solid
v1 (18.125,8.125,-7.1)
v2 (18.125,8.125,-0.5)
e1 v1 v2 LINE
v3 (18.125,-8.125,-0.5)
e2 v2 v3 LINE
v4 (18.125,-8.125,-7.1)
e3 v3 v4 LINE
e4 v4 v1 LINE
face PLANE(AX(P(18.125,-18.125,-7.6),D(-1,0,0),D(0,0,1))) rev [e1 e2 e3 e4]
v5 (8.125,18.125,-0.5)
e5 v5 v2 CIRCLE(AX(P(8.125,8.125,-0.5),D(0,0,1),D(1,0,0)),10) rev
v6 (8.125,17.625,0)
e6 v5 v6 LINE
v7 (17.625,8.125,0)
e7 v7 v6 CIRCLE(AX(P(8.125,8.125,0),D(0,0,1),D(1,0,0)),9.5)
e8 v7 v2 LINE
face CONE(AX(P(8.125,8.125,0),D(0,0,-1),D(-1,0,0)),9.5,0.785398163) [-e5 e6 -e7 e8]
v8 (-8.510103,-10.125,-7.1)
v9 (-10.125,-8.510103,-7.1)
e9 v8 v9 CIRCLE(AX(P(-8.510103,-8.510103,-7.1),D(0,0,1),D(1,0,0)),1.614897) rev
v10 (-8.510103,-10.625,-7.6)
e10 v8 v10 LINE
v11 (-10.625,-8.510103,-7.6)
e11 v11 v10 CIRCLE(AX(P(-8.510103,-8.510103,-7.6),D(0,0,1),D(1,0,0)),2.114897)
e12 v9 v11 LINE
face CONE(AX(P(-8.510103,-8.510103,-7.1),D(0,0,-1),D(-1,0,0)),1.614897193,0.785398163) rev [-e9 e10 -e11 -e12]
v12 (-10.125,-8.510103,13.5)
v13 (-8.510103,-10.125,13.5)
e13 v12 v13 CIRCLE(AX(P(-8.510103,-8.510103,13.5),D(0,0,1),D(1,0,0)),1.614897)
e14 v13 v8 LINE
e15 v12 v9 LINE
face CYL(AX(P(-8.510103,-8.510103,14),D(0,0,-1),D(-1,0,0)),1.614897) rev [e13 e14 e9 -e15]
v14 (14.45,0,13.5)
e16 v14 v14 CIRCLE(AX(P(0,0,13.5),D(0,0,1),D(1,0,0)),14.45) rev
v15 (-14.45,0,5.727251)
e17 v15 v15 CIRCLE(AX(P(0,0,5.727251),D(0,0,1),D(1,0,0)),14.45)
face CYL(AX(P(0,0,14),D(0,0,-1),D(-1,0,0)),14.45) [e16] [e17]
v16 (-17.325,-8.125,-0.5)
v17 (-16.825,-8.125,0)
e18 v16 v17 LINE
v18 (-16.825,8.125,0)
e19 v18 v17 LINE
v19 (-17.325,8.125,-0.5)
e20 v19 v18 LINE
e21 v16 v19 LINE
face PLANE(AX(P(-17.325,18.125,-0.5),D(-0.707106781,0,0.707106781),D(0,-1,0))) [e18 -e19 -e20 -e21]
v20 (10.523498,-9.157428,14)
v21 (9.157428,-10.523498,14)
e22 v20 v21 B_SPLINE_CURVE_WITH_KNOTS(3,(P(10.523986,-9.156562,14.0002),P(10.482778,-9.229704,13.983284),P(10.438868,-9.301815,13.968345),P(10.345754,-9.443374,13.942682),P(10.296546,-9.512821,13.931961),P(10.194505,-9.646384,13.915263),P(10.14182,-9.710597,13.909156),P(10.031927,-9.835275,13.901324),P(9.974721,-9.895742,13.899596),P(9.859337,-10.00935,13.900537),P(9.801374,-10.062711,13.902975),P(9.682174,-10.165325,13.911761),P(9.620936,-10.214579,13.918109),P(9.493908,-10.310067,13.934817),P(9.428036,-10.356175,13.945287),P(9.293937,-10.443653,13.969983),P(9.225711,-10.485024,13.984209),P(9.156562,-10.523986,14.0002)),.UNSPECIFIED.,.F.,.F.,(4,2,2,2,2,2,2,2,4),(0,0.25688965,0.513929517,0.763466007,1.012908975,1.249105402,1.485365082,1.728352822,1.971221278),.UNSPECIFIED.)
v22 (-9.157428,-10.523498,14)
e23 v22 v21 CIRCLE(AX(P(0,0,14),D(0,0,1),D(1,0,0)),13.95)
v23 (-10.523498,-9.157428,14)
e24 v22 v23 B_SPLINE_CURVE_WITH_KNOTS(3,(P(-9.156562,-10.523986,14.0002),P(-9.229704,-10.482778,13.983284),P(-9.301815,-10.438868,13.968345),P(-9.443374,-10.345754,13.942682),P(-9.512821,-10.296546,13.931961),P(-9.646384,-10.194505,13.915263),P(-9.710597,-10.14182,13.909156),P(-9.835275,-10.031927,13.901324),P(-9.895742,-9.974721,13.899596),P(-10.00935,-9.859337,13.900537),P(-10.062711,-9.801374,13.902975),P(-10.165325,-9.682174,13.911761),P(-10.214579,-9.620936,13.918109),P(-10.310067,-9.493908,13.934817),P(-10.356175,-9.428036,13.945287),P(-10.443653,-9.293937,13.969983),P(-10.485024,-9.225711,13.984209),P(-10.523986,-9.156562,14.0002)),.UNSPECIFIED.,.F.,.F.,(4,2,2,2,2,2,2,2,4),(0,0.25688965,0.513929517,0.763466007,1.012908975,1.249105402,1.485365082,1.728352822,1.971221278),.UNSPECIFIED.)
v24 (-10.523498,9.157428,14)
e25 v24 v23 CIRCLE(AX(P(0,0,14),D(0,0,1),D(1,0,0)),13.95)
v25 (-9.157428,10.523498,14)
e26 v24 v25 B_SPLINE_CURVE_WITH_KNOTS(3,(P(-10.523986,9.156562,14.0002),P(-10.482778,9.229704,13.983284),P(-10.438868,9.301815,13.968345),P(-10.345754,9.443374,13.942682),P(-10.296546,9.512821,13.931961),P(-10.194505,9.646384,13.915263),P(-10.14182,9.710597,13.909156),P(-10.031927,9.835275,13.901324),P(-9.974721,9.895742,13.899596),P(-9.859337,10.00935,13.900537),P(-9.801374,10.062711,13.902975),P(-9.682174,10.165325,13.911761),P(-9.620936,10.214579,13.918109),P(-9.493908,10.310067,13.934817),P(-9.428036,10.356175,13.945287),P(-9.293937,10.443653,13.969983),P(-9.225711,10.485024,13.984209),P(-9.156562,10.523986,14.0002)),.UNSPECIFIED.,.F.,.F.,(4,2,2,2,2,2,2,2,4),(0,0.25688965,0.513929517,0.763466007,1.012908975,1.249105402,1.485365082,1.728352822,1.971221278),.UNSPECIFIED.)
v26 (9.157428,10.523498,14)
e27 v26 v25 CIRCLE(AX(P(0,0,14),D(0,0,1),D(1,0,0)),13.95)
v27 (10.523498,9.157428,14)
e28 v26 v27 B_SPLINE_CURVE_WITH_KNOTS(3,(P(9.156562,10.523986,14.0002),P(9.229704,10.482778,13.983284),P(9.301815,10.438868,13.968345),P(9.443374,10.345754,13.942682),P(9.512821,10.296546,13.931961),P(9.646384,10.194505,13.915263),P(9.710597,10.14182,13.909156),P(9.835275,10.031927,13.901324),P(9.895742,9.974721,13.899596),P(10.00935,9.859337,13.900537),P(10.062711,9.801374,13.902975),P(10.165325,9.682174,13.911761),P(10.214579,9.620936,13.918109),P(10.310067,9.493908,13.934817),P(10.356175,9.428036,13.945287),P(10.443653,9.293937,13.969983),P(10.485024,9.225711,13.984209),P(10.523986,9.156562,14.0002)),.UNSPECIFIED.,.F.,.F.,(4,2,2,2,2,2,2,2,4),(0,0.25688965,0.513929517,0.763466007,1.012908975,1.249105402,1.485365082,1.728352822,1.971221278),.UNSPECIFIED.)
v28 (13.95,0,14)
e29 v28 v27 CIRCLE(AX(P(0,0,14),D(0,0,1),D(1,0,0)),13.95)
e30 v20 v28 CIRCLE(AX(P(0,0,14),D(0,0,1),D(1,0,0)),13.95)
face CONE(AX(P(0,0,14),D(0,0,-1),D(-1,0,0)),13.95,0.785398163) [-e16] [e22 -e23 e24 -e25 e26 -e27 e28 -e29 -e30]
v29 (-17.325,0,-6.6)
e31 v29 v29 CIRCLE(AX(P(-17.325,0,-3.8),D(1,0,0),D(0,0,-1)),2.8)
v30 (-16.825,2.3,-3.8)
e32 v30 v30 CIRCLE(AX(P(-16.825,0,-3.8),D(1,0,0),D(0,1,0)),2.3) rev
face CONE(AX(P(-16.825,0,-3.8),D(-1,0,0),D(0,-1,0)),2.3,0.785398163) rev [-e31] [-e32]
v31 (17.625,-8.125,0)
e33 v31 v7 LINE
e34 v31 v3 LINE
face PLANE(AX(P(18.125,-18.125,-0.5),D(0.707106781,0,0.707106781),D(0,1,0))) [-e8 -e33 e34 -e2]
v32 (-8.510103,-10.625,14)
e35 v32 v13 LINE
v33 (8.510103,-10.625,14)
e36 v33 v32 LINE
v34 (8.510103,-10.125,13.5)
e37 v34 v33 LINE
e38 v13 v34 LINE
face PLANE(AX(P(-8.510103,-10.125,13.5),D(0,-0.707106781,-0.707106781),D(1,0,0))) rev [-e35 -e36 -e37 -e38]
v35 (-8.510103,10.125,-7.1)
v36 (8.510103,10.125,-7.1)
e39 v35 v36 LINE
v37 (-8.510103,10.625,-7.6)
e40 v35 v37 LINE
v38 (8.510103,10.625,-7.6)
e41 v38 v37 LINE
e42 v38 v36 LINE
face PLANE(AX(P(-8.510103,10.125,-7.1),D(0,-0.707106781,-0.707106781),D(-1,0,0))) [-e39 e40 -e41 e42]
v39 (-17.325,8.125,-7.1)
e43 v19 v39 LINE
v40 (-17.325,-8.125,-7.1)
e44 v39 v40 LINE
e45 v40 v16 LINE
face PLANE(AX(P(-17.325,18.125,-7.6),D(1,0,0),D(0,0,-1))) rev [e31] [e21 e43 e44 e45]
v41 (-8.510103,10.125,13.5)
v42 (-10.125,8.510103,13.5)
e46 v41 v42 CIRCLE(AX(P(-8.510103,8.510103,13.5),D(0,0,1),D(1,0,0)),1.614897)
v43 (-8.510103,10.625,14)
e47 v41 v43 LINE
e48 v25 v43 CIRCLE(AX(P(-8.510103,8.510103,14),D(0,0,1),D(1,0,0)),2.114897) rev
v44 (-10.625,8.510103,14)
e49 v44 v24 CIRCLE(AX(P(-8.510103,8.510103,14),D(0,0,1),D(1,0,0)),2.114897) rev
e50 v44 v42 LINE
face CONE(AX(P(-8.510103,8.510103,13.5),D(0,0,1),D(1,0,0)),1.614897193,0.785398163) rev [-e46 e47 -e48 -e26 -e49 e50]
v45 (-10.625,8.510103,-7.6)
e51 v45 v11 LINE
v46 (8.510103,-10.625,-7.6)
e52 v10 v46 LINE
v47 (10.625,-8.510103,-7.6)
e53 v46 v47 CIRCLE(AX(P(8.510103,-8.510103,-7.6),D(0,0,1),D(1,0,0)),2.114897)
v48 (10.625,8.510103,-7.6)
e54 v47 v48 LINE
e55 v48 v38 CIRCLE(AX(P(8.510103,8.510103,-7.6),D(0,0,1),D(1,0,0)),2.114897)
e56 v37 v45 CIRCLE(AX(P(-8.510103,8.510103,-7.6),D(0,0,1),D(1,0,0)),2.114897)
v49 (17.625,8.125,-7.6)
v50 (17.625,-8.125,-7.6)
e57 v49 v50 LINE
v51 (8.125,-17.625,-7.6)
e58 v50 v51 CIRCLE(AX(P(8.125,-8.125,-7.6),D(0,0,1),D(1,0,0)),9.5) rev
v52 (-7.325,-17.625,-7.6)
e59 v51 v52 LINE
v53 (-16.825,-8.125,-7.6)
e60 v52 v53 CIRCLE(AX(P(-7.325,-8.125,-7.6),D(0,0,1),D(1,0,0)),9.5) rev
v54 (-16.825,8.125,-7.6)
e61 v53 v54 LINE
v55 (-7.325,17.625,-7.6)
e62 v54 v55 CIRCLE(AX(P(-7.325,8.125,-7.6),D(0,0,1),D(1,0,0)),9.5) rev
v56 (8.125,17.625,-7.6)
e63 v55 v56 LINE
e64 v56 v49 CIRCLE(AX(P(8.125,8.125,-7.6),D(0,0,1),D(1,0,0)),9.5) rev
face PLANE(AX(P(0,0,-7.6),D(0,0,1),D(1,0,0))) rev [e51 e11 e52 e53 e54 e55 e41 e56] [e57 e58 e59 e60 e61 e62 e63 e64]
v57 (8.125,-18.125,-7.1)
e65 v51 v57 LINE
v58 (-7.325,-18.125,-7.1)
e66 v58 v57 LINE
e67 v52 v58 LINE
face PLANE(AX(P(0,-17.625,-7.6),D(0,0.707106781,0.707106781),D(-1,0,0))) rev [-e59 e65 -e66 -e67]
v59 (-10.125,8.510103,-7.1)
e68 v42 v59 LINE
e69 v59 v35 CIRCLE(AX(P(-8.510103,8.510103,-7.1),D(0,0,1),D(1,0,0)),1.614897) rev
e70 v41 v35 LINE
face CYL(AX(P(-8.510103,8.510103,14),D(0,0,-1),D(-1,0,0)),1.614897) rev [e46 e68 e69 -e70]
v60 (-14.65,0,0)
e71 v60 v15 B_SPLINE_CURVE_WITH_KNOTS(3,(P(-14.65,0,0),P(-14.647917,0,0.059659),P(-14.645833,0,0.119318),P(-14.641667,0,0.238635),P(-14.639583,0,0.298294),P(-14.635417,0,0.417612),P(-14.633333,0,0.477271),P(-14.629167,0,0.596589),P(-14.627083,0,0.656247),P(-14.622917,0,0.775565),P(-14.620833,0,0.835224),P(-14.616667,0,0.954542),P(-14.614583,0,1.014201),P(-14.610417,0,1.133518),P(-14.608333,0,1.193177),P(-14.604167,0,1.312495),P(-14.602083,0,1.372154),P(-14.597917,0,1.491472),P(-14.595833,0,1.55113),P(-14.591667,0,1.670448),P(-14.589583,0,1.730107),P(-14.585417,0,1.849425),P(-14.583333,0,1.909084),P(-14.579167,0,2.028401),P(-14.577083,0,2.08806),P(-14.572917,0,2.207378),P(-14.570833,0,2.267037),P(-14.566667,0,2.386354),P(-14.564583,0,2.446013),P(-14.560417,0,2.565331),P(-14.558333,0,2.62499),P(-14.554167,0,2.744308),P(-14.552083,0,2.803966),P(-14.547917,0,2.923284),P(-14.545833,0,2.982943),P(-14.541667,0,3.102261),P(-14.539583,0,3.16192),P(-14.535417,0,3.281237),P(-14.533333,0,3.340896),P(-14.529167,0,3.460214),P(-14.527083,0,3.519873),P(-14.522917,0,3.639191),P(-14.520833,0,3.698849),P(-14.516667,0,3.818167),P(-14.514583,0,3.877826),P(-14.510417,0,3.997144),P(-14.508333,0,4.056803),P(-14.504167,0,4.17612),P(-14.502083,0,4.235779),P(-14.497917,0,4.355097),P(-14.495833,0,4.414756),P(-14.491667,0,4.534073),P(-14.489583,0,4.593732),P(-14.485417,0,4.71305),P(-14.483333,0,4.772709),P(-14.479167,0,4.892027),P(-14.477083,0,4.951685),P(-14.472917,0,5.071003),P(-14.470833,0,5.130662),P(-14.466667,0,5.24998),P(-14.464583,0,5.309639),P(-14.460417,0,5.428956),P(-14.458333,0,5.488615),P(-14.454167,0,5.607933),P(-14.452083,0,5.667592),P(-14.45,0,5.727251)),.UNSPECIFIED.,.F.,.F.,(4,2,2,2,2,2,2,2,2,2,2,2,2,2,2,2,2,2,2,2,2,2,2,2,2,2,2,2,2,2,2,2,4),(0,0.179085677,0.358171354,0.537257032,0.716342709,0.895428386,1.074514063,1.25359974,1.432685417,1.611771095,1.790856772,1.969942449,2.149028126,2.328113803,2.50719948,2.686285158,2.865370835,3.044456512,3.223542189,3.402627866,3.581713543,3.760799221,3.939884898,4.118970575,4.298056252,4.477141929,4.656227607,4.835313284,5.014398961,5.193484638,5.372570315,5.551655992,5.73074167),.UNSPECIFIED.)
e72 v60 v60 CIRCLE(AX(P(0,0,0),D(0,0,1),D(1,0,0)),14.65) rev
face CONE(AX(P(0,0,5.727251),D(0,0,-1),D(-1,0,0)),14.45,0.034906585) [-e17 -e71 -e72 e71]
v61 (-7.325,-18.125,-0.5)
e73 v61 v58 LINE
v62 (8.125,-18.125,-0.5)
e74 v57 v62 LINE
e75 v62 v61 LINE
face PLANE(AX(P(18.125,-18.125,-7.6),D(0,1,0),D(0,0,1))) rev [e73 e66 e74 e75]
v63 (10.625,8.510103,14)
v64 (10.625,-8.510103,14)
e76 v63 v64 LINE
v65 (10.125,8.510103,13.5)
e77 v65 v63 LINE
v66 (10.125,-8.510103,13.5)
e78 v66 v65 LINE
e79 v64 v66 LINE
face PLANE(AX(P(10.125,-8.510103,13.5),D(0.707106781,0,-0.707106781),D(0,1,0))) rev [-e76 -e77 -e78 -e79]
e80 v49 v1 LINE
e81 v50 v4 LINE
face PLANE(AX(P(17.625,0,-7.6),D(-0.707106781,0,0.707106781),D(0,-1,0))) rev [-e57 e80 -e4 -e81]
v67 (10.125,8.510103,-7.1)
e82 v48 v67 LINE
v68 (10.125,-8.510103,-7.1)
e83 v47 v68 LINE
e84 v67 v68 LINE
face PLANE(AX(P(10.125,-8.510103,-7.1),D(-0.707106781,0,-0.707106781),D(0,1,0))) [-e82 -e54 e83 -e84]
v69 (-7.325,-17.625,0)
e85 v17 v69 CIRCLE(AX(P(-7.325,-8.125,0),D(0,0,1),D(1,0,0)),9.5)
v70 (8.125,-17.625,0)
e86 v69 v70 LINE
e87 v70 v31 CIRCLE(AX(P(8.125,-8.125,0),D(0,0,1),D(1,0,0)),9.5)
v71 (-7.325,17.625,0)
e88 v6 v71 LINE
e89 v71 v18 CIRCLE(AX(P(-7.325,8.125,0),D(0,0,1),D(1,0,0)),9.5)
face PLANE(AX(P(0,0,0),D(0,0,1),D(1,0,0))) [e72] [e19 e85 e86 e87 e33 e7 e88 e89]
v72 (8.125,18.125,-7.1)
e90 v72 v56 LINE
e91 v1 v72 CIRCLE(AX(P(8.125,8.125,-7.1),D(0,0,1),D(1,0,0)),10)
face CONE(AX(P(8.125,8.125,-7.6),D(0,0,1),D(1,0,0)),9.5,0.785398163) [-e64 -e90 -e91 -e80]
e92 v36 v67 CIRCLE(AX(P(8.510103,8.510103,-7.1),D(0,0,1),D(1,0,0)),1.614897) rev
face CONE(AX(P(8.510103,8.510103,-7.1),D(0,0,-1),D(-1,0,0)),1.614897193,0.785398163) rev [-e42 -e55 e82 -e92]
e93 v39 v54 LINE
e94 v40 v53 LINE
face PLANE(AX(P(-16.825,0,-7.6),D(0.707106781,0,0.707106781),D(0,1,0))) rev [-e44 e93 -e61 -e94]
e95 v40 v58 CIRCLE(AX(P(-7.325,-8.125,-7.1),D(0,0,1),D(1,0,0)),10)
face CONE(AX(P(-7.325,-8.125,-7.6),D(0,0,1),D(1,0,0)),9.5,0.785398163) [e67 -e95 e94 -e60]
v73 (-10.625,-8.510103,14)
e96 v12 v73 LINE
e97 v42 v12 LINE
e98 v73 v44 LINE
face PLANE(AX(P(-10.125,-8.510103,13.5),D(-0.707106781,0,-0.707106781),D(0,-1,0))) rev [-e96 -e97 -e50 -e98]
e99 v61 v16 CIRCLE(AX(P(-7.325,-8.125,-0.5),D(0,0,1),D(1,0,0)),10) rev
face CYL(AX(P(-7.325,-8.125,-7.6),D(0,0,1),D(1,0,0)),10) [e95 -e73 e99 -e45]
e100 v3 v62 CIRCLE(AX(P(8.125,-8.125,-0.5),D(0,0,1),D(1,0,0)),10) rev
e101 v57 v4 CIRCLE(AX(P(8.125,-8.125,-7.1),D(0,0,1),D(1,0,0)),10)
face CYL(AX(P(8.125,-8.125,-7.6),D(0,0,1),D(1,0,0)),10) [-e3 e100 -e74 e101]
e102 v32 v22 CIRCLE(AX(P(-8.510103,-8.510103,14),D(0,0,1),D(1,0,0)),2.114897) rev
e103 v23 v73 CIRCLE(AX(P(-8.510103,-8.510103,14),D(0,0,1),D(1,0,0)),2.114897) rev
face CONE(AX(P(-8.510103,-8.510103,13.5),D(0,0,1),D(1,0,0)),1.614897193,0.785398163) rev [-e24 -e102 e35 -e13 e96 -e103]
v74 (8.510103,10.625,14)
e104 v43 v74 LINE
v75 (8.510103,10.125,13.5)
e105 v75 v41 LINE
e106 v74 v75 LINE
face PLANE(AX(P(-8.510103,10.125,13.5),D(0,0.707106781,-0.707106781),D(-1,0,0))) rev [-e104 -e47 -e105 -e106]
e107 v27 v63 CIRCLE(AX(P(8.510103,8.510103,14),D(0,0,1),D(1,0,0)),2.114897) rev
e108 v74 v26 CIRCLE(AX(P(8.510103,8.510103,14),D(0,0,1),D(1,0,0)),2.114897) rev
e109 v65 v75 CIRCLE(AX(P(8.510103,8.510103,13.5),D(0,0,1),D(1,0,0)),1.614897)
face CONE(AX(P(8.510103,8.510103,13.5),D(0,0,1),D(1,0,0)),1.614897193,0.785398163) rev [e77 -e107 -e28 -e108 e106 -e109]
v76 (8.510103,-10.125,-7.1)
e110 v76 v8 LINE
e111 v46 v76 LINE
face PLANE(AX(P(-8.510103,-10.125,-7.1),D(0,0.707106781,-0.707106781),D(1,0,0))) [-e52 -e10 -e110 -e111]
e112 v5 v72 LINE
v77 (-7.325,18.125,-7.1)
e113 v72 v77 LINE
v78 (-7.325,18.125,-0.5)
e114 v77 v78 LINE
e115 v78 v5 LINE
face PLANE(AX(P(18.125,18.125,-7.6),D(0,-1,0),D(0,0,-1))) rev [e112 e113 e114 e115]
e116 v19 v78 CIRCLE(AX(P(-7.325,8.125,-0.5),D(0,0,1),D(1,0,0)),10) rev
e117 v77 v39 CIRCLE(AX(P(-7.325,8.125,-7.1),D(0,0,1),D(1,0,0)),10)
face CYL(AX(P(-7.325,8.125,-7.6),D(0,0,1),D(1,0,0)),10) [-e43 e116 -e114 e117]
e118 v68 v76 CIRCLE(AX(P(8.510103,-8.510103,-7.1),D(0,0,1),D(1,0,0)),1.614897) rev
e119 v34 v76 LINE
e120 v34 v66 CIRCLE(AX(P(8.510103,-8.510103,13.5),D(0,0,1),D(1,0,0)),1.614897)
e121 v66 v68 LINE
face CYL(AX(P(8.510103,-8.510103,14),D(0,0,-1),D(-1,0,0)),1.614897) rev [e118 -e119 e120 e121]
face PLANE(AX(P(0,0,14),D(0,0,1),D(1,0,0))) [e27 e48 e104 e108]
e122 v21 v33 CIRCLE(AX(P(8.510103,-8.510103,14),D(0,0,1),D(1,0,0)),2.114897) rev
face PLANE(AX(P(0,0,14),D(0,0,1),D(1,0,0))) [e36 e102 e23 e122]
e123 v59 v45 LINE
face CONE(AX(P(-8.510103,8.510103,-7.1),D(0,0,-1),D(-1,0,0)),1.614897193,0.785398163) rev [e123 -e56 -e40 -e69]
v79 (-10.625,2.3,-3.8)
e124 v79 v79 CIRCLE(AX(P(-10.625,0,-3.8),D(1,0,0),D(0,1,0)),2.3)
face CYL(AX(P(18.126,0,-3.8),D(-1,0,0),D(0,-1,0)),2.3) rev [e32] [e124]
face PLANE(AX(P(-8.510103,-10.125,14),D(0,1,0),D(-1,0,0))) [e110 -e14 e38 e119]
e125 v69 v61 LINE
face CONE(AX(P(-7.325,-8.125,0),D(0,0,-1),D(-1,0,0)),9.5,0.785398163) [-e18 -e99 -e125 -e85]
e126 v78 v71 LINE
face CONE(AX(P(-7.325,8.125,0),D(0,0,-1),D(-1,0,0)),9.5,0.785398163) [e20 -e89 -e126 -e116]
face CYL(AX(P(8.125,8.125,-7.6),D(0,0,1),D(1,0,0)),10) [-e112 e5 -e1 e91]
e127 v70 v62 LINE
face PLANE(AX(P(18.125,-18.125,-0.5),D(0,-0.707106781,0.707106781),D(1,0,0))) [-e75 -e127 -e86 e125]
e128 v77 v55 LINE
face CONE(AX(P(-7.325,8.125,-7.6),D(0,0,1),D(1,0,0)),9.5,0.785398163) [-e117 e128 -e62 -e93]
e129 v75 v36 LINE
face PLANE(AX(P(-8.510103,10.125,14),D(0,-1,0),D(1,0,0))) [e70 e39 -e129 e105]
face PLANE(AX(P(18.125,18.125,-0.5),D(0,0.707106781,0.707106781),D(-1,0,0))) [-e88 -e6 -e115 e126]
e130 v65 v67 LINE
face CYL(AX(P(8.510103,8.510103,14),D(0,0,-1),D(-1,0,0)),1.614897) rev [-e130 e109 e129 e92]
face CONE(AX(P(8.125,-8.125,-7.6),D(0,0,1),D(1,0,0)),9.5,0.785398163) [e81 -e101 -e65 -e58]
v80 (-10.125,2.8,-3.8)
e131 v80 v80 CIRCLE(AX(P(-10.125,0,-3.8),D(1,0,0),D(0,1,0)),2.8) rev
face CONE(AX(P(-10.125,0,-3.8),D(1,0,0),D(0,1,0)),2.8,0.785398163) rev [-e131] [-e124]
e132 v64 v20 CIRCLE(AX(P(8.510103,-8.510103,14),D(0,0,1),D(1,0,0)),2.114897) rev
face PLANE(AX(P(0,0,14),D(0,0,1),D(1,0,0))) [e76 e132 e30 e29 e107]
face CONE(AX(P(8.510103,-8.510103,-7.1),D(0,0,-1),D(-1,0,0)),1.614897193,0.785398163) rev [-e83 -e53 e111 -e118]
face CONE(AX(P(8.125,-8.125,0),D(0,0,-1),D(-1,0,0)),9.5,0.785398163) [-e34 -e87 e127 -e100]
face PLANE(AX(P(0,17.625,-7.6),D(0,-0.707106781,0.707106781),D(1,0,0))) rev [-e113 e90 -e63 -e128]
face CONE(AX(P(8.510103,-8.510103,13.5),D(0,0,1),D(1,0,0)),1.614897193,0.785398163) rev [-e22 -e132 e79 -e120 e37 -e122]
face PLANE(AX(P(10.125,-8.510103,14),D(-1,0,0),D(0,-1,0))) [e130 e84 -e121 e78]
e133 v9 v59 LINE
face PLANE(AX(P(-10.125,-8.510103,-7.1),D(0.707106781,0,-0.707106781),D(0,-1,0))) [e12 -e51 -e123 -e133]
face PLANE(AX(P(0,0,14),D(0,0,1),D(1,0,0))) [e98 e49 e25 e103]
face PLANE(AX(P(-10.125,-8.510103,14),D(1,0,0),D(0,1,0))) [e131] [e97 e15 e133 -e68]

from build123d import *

# Parameters (mm, degrees)
SKETCH1_R           = 14.45
BOSS_EXTRUDE1_DEPTH = 14
BOSS_EXTRUDE2_START = 7.6
SKETCH2_W           = 35.45
SKETCH2_H           = 36.25
BOSS_EXTRUDE2_DEPTH = 7.6
FILLET1_R           = 10
CUT_EXTRUDE1_REACH  = 44.204
SKETCH3_R           = 2.3
CHAMFER1_SIZE       = 0.5
CHAMFER2_SIZE       = 0.2
CHAMFER2_SIZE2      = 5.727250657
CHAMFER3_SIZE       = 0.5


with BuildPart() as part:
    # Sketch1 → Boss-Extrude1 (new body)
    with BuildSketch(Plane.XY):
        Circle(SKETCH1_R)
        with BuildLine():
            Line((-8.510102807, -10.125), (8.510102807, -10.125))
            ThreePointArc((8.510102807, -10.125), (9.652007563, -9.652007563), (10.125, -8.510102807))
            Line((10.125, -8.510102807), (10.125, 8.510102807))
            ThreePointArc((10.125, 8.510102807), (9.652007563, 9.652007563), (8.510102807, 10.125))
            Line((8.510102807, 10.125), (-8.510102807, 10.125))
            ThreePointArc((-8.510102807, 10.125), (-9.652007563, 9.652007563), (-10.125, 8.510102807))
            Line((-10.125, 8.510102807), (-10.125, -8.510102807))
            ThreePointArc((-10.125, -8.510102807), (-9.652007563, -9.652007563), (-8.510102807, -10.125))
        make_face(mode=Mode.SUBTRACT)
    extrude(amount=BOSS_EXTRUDE1_DEPTH)

    # Sketch2 → Boss-Extrude2 (add)
    with BuildSketch(Plane(origin=(0, 0, 0), x_dir=(-1, 0, 0), z_dir=(0, 0, -1)).offset(BOSS_EXTRUDE2_START)):
        with Locations((-0.4, 0)):
            Rectangle(SKETCH2_W, SKETCH2_H)
        with BuildLine():
            Line((8.510102807, -10.125), (-8.510102807, -10.125))
            ThreePointArc((-8.510102807, -10.125), (-9.652007563, -9.652007563), (-10.125, -8.510102807))
            Line((-10.125, -8.510102807), (-10.125, 8.510102807))
            ThreePointArc((-10.125, 8.510102807), (-9.652007563, 9.652007563), (-8.510102807, 10.125))
            Line((-8.510102807, 10.125), (8.510102807, 10.125))
            ThreePointArc((8.510102807, 10.125), (9.652007563, 9.652007563), (10.125, 8.510102807))
            Line((10.125, 8.510102807), (10.125, -8.510102807))
            ThreePointArc((10.125, -8.510102807), (9.652007563, -9.652007563), (8.510102807, -10.125))
        make_face(mode=Mode.SUBTRACT)
    extrude(amount=-BOSS_EXTRUDE2_DEPTH)

    # Fillet1
    fillet1_edges = [part.edges().sort_by_distance(p)[0] for p in [
        (18.125, 18.125, -3.8),
        (18.125, -18.125, -3.8),
        (-17.325, -18.125, -3.8),
        (-17.325, 18.125, -3.8),
    ]]
    fillet(fillet1_edges, radius=FILLET1_R)

    # Sketch3 → Cut-Extrude1 (cut, up to next)
    with BuildSketch(Plane.ZY.offset(17.325), mode=Mode.PRIVATE) as cut_extrude1_sk1:
        with Locations(Location((-3.8, 0, 0), (0, 0, 270))):
            Circle(SKETCH3_R)
    cut_extrude1_tool1 = extrude(cut_extrude1_sk1.sketch, amount=-CUT_EXTRUDE1_REACH, mode=Mode.PRIVATE) & part.part
    add(cut_extrude1_tool1.solids().sort_by_distance((-17.325, 0, -3.8))[0], mode=Mode.SUBTRACT)

    # Chamfer1
    chamfer1_edges = [part.edges().sort_by_distance(p)[0] for p in [
        (-9.652007563, 9.652007563, -7.6),
        (0, 10.125, -7.6),
        (9.652007563, 9.652007563, -7.6),
        (10.125, 0, -7.6),
        (9.652007563, -9.652007563, -7.6),
        (0, -10.125, -7.6),
        (-9.652007563, -9.652007563, -7.6),
        (-10.125, 0, -7.6),
        (0.4, 18.125, 0),
        (0.4, 18.125, -7.6),
        (18.125, 0, 0),
        (-17.325, 0, 0),
        (0.4, -18.125, 0),
        (-14.396067812, -15.196067812, 0),
        (15.196067812, -15.196067812, 0),
        (15.196067812, 15.196067812, 0),
        (-14.396067812, 15.196067812, 0),
        (-17.325, 0, -7.6),
        (18.125, 0, -7.6),
        (0.4, -18.125, -7.6),
        (-14.396067812, -15.196067812, -7.6),
        (15.196067812, -15.196067812, -7.6),
        (15.196067812, 15.196067812, -7.6),
        (-14.396067812, 15.196067812, -7.6),
        (-10.125, 2.3, -3.8),
        (-17.325, 2.3, -3.8),
    ]]
    chamfer(chamfer1_edges, length=CHAMFER1_SIZE)

    # Chamfer2
    chamfer2_edges = [part.edges().sort_by_distance(p)[0] for p in [
        (-14.45, 0, 0),
    ]]
    chamfer2_side = [part.faces().sort_by_distance(p)[0] for p in [
        (0.4, 17.132114111, 0),
    ]]
    chamfer(chamfer2_edges, length=CHAMFER2_SIZE, length2=CHAMFER2_SIZE2, reference=chamfer2_side[0])

    # Chamfer3
    # the kernel refuses this chamfer: 0.5 mm, written as the material it takes off along each edge
    with BuildSketch(Plane(origin=(8.510102807, -8.510102807, 14), x_dir=(0, -1, 0), z_dir=(-1, 0, 0))) as chamfer3_piece_1:
        Polygon((1.614897193 + CHAMFER3_SIZE, 0), (1.614897193, -CHAMFER3_SIZE), (1.614897193, 0), align=None)
    revolve(axis=Axis((8.510102807, -8.510102807, 14), (0, 0, 1)), revolution_arc=90, mode=Mode.SUBTRACT)
    with BuildSketch(Plane(origin=(10.125, -8.510102807, 14), x_dir=(0.9996219169112968, 2.0865614307067877e-15, 0.027495876610585647), z_dir=(0, 1, 0)), Plane(origin=(8.510102807, 10.125, 14), x_dir=(-1.877905287636107e-15, 0.9996219169112968, 0.027495876610585647), z_dir=(-1, 0, 0)), Plane(origin=(-10.125, 8.510102807, 14), x_dir=(-0.9996219169112968, 0, 0.027495876610585647), z_dir=(0, -1, 0)), Plane(origin=(-8.510102807, -10.125, 14), x_dir=(0, -0.9996219169112968, 0.027495876610585647), z_dir=(1, 0, 0))) as chamfer3_piece_2:
        Polygon((CHAMFER3_SIZE * 0.999621916911, CHAMFER3_SIZE * 0.0274958766106), (-CHAMFER3_SIZE * 0.0274958766106, CHAMFER3_SIZE * 0.999621916911), (0, 0), align=None)
    extrude(amount=17.020205615, mode=Mode.SUBTRACT)
    with BuildSketch(Plane(origin=(8.510102807, 8.510102807, 14), x_dir=(1, 0, 0), z_dir=(0, -1, 0))) as chamfer3_piece_3:
        Polygon((1.614897193 + CHAMFER3_SIZE, 0), (1.614897193, -CHAMFER3_SIZE), (1.614897193, 0), align=None)
    revolve(axis=Axis((8.510102807, 8.510102807, 14), (0, 0, 1)), revolution_arc=90, mode=Mode.SUBTRACT)
    with BuildSketch(Plane(origin=(-8.510102807, 8.510102807, 14), x_dir=(0, 1, 0), z_dir=(1, 0, 0))) as chamfer3_piece_4:
        Polygon((1.614897193 + CHAMFER3_SIZE, 0), (1.614897193, -CHAMFER3_SIZE), (1.614897193, 0), align=None)
    revolve(axis=Axis((-8.510102807, 8.510102807, 14), (0, 0, 1)), revolution_arc=90, mode=Mode.SUBTRACT)
    with BuildSketch(Plane(origin=(-8.510102807, -8.510102807, 14), x_dir=(-1, 0, 0), z_dir=(0, 1, 0))) as chamfer3_piece_5:
        Polygon((1.614897193 + CHAMFER3_SIZE, 0), (1.614897193, -CHAMFER3_SIZE), (1.614897193, 0), align=None)
    revolve(axis=Axis((-8.510102807, -8.510102807, 14), (0, 0, 1)), revolution_arc=90, mode=Mode.SUBTRACT)
    with BuildSketch(Plane(origin=(0, 0, 14), x_dir=(1, 0, 0), z_dir=(0, -1, 0))) as chamfer3_piece_6:
        Polygon((14.45, -CHAMFER3_SIZE), (14.45 - CHAMFER3_SIZE, 0), (14.45, 0), align=None)
    revolve(axis=Axis((0, 0, 14), (0, 0, 1)), mode=Mode.SUBTRACT)


solid = part.part
